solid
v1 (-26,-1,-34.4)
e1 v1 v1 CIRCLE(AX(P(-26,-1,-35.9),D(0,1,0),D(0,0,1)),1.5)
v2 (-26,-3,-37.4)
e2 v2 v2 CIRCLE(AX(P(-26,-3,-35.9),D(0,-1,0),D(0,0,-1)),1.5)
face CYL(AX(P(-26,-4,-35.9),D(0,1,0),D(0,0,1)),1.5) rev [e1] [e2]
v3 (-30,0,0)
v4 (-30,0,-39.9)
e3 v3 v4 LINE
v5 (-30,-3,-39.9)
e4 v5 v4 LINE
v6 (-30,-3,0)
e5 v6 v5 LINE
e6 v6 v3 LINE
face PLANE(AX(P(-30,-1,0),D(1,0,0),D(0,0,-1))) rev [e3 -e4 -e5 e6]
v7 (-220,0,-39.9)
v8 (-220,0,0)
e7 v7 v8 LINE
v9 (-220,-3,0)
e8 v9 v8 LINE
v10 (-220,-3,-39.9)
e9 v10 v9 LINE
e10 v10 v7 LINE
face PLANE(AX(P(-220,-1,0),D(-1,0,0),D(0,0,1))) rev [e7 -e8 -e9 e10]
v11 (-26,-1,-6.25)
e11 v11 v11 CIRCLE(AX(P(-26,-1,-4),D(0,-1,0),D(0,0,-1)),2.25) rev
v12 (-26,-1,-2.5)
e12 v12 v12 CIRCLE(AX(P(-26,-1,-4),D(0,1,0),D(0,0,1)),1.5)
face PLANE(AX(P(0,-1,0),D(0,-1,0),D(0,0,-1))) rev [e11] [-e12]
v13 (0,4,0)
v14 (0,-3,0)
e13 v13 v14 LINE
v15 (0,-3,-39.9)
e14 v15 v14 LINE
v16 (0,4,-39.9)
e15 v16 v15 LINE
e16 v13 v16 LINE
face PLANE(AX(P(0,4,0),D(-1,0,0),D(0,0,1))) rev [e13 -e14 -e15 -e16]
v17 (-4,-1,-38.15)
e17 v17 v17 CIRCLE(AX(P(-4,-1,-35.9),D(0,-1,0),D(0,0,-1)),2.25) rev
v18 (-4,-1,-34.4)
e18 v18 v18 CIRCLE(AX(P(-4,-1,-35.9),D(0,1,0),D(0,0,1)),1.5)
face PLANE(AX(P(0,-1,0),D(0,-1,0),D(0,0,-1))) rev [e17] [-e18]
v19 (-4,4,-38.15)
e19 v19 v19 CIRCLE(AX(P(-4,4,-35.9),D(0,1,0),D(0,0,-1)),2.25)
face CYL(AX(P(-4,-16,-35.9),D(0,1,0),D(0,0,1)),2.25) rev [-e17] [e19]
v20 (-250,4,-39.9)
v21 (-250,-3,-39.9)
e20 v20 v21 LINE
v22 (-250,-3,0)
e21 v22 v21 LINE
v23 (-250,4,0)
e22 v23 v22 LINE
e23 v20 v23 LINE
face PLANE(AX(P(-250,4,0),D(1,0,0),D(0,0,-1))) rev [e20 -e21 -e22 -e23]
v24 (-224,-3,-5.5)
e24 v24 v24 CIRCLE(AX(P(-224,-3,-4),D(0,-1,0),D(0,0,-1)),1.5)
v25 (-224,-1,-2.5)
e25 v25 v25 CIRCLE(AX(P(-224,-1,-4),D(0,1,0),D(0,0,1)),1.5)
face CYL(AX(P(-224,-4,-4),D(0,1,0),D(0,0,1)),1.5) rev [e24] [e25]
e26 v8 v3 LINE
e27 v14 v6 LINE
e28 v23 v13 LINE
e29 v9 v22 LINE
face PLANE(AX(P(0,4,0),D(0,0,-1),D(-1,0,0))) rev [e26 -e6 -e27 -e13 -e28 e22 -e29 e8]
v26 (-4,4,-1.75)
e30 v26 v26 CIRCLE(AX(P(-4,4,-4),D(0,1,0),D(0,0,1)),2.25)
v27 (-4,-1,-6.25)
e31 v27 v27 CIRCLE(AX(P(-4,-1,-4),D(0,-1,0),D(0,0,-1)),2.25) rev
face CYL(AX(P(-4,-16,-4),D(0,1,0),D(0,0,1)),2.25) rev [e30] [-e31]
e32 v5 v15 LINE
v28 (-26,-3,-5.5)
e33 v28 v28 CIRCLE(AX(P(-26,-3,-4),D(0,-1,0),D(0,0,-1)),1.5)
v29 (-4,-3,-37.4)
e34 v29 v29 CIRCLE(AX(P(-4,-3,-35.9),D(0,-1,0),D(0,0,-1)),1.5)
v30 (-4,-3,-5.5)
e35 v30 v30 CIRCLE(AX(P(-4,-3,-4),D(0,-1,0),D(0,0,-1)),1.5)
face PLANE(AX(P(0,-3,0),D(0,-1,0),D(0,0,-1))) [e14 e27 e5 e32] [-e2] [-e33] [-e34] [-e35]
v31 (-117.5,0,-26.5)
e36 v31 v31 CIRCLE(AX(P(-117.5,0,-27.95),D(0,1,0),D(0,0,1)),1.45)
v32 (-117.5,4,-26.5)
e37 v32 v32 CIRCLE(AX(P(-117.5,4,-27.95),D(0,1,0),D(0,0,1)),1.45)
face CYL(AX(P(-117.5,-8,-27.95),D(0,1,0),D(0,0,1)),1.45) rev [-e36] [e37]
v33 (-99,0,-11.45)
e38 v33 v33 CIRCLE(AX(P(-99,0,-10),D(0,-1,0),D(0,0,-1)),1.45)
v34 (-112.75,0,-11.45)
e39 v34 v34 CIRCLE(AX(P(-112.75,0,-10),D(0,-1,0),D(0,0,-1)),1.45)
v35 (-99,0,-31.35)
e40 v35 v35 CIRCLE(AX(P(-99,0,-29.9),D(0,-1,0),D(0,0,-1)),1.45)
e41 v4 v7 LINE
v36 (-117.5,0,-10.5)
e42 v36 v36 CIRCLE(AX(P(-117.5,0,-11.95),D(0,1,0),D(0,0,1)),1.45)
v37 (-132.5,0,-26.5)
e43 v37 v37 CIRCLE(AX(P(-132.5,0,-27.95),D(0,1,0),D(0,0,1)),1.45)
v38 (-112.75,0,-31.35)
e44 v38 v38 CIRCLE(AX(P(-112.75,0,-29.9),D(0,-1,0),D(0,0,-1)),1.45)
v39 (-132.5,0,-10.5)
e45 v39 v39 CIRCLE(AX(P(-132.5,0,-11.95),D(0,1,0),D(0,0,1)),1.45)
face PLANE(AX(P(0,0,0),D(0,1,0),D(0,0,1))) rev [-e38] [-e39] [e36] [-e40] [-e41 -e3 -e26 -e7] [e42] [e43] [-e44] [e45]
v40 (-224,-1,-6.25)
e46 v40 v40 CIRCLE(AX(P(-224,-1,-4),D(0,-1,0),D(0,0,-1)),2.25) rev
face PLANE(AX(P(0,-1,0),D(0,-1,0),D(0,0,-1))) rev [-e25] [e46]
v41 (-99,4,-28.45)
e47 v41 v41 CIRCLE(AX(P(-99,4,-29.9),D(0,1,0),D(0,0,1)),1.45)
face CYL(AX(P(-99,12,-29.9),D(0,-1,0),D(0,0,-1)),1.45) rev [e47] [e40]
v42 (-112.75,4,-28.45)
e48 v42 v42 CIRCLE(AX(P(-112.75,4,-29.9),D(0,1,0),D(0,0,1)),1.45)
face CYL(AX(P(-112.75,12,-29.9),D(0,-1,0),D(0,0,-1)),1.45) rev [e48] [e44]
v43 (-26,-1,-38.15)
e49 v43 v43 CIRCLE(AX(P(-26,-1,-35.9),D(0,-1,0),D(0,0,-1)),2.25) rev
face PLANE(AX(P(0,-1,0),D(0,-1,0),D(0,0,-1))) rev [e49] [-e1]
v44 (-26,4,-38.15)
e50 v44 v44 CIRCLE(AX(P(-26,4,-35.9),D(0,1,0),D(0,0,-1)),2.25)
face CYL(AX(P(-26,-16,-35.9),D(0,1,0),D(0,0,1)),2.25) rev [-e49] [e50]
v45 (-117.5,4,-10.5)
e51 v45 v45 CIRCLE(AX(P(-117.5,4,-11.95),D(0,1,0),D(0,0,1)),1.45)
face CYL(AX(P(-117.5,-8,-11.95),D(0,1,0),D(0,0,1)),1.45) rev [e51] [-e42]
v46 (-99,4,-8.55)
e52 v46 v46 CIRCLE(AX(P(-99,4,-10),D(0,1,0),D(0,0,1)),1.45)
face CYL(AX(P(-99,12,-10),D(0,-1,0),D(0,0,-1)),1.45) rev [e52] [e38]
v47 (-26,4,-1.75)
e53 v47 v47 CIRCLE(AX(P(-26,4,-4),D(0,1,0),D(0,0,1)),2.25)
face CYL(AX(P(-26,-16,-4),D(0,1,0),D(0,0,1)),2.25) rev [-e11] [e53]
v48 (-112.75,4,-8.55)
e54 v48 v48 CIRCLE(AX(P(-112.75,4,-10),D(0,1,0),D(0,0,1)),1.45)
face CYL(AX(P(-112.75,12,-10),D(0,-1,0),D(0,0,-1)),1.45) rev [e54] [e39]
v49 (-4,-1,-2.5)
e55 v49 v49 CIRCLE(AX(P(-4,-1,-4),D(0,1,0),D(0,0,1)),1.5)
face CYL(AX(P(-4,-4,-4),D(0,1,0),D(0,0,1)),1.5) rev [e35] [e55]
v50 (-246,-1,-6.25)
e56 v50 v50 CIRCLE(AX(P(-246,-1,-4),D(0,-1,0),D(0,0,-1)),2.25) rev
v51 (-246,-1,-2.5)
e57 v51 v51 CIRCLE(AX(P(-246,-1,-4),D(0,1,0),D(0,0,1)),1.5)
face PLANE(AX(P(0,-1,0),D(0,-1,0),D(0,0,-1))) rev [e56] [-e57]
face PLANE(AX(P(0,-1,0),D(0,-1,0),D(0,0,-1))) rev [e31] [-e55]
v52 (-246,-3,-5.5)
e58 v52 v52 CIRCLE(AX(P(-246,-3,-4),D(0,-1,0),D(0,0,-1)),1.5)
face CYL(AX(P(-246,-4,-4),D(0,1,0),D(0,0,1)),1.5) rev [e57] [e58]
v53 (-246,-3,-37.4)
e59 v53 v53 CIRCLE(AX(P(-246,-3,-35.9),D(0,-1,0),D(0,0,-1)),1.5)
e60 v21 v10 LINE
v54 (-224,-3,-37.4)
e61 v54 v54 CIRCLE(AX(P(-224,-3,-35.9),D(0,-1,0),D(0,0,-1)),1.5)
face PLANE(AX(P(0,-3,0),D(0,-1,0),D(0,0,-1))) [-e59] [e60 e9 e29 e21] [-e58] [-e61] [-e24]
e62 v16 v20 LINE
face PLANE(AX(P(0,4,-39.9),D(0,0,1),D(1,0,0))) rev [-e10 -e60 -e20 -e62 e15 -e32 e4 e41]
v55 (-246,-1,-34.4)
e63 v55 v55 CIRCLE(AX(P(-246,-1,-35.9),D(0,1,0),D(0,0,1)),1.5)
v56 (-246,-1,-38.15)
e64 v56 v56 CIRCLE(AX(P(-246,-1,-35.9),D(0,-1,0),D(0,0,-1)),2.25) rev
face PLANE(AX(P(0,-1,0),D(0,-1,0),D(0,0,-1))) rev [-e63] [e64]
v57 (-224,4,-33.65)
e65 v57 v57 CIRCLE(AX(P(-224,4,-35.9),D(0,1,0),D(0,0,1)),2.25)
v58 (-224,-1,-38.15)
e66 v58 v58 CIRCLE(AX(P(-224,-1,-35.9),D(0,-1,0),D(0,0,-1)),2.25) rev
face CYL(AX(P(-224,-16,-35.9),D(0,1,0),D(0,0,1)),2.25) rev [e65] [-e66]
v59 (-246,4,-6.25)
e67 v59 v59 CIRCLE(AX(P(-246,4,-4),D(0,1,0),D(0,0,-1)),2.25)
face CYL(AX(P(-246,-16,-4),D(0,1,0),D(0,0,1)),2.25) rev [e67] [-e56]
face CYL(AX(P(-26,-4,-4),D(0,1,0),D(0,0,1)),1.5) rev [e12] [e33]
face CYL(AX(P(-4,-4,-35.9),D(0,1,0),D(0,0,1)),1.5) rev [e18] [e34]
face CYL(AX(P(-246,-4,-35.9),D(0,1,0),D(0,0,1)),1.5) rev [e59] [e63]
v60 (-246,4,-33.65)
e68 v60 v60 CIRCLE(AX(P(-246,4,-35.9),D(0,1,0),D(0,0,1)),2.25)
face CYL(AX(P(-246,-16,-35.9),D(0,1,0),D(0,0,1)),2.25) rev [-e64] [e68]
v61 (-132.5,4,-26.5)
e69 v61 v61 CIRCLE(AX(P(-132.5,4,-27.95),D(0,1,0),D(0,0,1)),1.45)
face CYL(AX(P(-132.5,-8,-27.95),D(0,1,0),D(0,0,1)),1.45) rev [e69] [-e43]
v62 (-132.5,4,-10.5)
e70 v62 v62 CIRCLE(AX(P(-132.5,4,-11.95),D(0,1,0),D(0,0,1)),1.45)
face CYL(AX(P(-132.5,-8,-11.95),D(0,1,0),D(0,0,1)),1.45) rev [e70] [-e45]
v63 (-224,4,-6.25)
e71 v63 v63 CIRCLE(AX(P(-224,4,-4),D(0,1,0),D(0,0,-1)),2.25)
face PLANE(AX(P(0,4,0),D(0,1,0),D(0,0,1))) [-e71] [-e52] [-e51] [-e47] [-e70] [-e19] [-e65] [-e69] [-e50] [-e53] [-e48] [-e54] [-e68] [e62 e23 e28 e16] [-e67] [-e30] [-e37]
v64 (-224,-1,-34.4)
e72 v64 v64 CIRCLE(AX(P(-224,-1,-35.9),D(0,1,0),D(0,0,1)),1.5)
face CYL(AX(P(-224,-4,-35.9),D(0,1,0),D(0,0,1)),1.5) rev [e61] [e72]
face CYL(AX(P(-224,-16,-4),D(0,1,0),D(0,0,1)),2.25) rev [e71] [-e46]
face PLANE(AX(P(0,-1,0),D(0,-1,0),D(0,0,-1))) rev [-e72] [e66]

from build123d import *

# Parameters (mm, degrees)
SKETCH_1_W          = 250
SKETCH_1_H          = 39.9
EXTRUDE_1_DEPTH     = 4
SKETCH_2_R          = 1.45
CUT_EXTRUDE_1_DEPTH = 12
SKETCH_3_R          = 1.45
CUT_EXTRUDE_2_DEPTH = 12
SKETCH_7_R          = 2.25
CUT_EXTRUDE_6_DEPTH = 20
SKETCH_8_W          = 30
SKETCH_8_H          = 39.9
SKETCH_8_R          = 2.25
EXTRUDE_2_DEPTH     = 1
SKETCH_9_W          = 30
SKETCH_9_H          = 39.9
EXTRUDE_3_DEPTH     = 2
SKETCH_10_R         = 1.5
CUT_EXTRUDE_7_DEPTH = 3


with BuildPart() as part:
    # 草图1 → 凸台-拉伸1 (new body)
    with BuildSketch(Plane(origin=(0, 0, 0), x_dir=(1, 0, 0), z_dir=(0, 1, 0))):
        with Locations((-125, 19.95)):
            Rectangle(SKETCH_1_W, SKETCH_1_H)
    extrude(amount=EXTRUDE_1_DEPTH)

    # 草图2 → 切除-拉伸1 (cut)
    with BuildSketch(Plane(origin=(0, 4, 0), x_dir=(1, 0, 0), z_dir=(0, 1, 0))):
        with Locations((-132.5, 27.95)):
            Circle(SKETCH_2_R)
        with Locations((-117.5, 27.95)):
            Circle(SKETCH_2_R)
        with Locations((-117.5, 11.95)):
            Circle(SKETCH_2_R)
        with Locations((-132.5, 11.95)):
            Circle(SKETCH_2_R)
    extrude(amount=-CUT_EXTRUDE_1_DEPTH, mode=Mode.SUBTRACT)

    # 草图3 → 切除-拉伸2 (cut)
    with BuildSketch(Plane(origin=(-275.091791604, 0, 148.847510468), x_dir=(-0.9999983055135633, 0, 0.0018409155336922224), z_dir=(0, -1, 0))):
        with Locations((-162.633941367, 158.548383777)):
            Circle(SKETCH_3_R)
        with Locations((-162.670575586, 178.448350057)):
            Circle(SKETCH_3_R)
        with Locations((-176.383918068, 158.523071189)):
            Circle(SKETCH_3_R)
        with Locations((-176.420552287, 178.423037468)):
            Circle(SKETCH_3_R)
    extrude(amount=-CUT_EXTRUDE_2_DEPTH, mode=Mode.SUBTRACT)

    # 草图7 → 切除-拉伸6 (cut)
    with BuildSketch(Plane(origin=(0, 4, 0), x_dir=(1, 0, 0), z_dir=(0, 1, 0))):
        with Locations((-246, 35.9)):
            Circle(SKETCH_7_R)
        with Locations((-224, 35.9)):
            Circle(SKETCH_7_R)
        with Locations((-224, 4)):
            Circle(SKETCH_7_R)
        with Locations((-246, 4)):
            Circle(SKETCH_7_R)
        with Locations((-4, 4)):
            Circle(SKETCH_7_R)
        with Locations((-26, 4)):
            Circle(SKETCH_7_R)
        with Locations((-26, 35.9)):
            Circle(SKETCH_7_R)
        with Locations((-4, 35.9)):
            Circle(SKETCH_7_R)
    extrude(amount=-CUT_EXTRUDE_6_DEPTH, mode=Mode.SUBTRACT)

    # 草图8 → 凸台-拉伸2 (add)
    # profile 1 of 2: a face of its own
    with BuildSketch(Plane.XZ):
        with Locations((-235, -19.95)):
            Rectangle(SKETCH_8_W, SKETCH_8_H)
        with Locations((-224, -35.9)):
            Circle(SKETCH_8_R, mode=Mode.SUBTRACT)
        with Locations((-246, -35.9)):
            Circle(SKETCH_8_R, mode=Mode.SUBTRACT)
        with Locations((-224, -4)):
            Circle(SKETCH_8_R, mode=Mode.SUBTRACT)
        with Locations((-246, -4)):
            Circle(SKETCH_8_R, mode=Mode.SUBTRACT)
    # profile 2 of 2: a face of its own
    with BuildSketch(Plane.XZ):
        with Locations((-15, -19.95)):
            Rectangle(SKETCH_8_W, SKETCH_8_H)
        with Locations((-4, -35.9)):
            Circle(SKETCH_8_R, mode=Mode.SUBTRACT)
        with Locations((-26, -35.9)):
            Circle(SKETCH_8_R, mode=Mode.SUBTRACT)
        with Locations((-4, -4)):
            Circle(SKETCH_8_R, mode=Mode.SUBTRACT)
        with Locations((-26, -4)):
            Circle(SKETCH_8_R, mode=Mode.SUBTRACT)
    extrude(amount=EXTRUDE_2_DEPTH)

    # 草图9 → 凸台-拉伸3 (add)
    with BuildSketch(Plane.XZ.offset(1)):
        with Locations((-15, -19.95)):
            Rectangle(SKETCH_9_W, SKETCH_9_H)
        with Locations((-235, -19.95)):
            Rectangle(SKETCH_9_W, SKETCH_9_H)
    extrude(amount=EXTRUDE_3_DEPTH)

    # 草图10 → 切除-拉伸7 (cut)
    with BuildSketch(Plane(origin=(0, -1, 0), x_dir=(1, 0, 0), z_dir=(0, 1, 0))):
        with Locations((-246, 35.9)):
            Circle(SKETCH_10_R)
        with Locations((-246, 4)):
            Circle(SKETCH_10_R)
        with Locations((-224, 35.9)):
            Circle(SKETCH_10_R)
        with Locations((-224, 4)):
            Circle(SKETCH_10_R)
        with Locations((-26, 35.9)):
            Circle(SKETCH_10_R)
        with Locations((-26, 4)):
            Circle(SKETCH_10_R)
        with Locations((-4, 35.9)):
            Circle(SKETCH_10_R)
        with Locations((-4, 4)):
            Circle(SKETCH_10_R)
    extrude(amount=-CUT_EXTRUDE_7_DEPTH, mode=Mode.SUBTRACT)


solid = part.part
